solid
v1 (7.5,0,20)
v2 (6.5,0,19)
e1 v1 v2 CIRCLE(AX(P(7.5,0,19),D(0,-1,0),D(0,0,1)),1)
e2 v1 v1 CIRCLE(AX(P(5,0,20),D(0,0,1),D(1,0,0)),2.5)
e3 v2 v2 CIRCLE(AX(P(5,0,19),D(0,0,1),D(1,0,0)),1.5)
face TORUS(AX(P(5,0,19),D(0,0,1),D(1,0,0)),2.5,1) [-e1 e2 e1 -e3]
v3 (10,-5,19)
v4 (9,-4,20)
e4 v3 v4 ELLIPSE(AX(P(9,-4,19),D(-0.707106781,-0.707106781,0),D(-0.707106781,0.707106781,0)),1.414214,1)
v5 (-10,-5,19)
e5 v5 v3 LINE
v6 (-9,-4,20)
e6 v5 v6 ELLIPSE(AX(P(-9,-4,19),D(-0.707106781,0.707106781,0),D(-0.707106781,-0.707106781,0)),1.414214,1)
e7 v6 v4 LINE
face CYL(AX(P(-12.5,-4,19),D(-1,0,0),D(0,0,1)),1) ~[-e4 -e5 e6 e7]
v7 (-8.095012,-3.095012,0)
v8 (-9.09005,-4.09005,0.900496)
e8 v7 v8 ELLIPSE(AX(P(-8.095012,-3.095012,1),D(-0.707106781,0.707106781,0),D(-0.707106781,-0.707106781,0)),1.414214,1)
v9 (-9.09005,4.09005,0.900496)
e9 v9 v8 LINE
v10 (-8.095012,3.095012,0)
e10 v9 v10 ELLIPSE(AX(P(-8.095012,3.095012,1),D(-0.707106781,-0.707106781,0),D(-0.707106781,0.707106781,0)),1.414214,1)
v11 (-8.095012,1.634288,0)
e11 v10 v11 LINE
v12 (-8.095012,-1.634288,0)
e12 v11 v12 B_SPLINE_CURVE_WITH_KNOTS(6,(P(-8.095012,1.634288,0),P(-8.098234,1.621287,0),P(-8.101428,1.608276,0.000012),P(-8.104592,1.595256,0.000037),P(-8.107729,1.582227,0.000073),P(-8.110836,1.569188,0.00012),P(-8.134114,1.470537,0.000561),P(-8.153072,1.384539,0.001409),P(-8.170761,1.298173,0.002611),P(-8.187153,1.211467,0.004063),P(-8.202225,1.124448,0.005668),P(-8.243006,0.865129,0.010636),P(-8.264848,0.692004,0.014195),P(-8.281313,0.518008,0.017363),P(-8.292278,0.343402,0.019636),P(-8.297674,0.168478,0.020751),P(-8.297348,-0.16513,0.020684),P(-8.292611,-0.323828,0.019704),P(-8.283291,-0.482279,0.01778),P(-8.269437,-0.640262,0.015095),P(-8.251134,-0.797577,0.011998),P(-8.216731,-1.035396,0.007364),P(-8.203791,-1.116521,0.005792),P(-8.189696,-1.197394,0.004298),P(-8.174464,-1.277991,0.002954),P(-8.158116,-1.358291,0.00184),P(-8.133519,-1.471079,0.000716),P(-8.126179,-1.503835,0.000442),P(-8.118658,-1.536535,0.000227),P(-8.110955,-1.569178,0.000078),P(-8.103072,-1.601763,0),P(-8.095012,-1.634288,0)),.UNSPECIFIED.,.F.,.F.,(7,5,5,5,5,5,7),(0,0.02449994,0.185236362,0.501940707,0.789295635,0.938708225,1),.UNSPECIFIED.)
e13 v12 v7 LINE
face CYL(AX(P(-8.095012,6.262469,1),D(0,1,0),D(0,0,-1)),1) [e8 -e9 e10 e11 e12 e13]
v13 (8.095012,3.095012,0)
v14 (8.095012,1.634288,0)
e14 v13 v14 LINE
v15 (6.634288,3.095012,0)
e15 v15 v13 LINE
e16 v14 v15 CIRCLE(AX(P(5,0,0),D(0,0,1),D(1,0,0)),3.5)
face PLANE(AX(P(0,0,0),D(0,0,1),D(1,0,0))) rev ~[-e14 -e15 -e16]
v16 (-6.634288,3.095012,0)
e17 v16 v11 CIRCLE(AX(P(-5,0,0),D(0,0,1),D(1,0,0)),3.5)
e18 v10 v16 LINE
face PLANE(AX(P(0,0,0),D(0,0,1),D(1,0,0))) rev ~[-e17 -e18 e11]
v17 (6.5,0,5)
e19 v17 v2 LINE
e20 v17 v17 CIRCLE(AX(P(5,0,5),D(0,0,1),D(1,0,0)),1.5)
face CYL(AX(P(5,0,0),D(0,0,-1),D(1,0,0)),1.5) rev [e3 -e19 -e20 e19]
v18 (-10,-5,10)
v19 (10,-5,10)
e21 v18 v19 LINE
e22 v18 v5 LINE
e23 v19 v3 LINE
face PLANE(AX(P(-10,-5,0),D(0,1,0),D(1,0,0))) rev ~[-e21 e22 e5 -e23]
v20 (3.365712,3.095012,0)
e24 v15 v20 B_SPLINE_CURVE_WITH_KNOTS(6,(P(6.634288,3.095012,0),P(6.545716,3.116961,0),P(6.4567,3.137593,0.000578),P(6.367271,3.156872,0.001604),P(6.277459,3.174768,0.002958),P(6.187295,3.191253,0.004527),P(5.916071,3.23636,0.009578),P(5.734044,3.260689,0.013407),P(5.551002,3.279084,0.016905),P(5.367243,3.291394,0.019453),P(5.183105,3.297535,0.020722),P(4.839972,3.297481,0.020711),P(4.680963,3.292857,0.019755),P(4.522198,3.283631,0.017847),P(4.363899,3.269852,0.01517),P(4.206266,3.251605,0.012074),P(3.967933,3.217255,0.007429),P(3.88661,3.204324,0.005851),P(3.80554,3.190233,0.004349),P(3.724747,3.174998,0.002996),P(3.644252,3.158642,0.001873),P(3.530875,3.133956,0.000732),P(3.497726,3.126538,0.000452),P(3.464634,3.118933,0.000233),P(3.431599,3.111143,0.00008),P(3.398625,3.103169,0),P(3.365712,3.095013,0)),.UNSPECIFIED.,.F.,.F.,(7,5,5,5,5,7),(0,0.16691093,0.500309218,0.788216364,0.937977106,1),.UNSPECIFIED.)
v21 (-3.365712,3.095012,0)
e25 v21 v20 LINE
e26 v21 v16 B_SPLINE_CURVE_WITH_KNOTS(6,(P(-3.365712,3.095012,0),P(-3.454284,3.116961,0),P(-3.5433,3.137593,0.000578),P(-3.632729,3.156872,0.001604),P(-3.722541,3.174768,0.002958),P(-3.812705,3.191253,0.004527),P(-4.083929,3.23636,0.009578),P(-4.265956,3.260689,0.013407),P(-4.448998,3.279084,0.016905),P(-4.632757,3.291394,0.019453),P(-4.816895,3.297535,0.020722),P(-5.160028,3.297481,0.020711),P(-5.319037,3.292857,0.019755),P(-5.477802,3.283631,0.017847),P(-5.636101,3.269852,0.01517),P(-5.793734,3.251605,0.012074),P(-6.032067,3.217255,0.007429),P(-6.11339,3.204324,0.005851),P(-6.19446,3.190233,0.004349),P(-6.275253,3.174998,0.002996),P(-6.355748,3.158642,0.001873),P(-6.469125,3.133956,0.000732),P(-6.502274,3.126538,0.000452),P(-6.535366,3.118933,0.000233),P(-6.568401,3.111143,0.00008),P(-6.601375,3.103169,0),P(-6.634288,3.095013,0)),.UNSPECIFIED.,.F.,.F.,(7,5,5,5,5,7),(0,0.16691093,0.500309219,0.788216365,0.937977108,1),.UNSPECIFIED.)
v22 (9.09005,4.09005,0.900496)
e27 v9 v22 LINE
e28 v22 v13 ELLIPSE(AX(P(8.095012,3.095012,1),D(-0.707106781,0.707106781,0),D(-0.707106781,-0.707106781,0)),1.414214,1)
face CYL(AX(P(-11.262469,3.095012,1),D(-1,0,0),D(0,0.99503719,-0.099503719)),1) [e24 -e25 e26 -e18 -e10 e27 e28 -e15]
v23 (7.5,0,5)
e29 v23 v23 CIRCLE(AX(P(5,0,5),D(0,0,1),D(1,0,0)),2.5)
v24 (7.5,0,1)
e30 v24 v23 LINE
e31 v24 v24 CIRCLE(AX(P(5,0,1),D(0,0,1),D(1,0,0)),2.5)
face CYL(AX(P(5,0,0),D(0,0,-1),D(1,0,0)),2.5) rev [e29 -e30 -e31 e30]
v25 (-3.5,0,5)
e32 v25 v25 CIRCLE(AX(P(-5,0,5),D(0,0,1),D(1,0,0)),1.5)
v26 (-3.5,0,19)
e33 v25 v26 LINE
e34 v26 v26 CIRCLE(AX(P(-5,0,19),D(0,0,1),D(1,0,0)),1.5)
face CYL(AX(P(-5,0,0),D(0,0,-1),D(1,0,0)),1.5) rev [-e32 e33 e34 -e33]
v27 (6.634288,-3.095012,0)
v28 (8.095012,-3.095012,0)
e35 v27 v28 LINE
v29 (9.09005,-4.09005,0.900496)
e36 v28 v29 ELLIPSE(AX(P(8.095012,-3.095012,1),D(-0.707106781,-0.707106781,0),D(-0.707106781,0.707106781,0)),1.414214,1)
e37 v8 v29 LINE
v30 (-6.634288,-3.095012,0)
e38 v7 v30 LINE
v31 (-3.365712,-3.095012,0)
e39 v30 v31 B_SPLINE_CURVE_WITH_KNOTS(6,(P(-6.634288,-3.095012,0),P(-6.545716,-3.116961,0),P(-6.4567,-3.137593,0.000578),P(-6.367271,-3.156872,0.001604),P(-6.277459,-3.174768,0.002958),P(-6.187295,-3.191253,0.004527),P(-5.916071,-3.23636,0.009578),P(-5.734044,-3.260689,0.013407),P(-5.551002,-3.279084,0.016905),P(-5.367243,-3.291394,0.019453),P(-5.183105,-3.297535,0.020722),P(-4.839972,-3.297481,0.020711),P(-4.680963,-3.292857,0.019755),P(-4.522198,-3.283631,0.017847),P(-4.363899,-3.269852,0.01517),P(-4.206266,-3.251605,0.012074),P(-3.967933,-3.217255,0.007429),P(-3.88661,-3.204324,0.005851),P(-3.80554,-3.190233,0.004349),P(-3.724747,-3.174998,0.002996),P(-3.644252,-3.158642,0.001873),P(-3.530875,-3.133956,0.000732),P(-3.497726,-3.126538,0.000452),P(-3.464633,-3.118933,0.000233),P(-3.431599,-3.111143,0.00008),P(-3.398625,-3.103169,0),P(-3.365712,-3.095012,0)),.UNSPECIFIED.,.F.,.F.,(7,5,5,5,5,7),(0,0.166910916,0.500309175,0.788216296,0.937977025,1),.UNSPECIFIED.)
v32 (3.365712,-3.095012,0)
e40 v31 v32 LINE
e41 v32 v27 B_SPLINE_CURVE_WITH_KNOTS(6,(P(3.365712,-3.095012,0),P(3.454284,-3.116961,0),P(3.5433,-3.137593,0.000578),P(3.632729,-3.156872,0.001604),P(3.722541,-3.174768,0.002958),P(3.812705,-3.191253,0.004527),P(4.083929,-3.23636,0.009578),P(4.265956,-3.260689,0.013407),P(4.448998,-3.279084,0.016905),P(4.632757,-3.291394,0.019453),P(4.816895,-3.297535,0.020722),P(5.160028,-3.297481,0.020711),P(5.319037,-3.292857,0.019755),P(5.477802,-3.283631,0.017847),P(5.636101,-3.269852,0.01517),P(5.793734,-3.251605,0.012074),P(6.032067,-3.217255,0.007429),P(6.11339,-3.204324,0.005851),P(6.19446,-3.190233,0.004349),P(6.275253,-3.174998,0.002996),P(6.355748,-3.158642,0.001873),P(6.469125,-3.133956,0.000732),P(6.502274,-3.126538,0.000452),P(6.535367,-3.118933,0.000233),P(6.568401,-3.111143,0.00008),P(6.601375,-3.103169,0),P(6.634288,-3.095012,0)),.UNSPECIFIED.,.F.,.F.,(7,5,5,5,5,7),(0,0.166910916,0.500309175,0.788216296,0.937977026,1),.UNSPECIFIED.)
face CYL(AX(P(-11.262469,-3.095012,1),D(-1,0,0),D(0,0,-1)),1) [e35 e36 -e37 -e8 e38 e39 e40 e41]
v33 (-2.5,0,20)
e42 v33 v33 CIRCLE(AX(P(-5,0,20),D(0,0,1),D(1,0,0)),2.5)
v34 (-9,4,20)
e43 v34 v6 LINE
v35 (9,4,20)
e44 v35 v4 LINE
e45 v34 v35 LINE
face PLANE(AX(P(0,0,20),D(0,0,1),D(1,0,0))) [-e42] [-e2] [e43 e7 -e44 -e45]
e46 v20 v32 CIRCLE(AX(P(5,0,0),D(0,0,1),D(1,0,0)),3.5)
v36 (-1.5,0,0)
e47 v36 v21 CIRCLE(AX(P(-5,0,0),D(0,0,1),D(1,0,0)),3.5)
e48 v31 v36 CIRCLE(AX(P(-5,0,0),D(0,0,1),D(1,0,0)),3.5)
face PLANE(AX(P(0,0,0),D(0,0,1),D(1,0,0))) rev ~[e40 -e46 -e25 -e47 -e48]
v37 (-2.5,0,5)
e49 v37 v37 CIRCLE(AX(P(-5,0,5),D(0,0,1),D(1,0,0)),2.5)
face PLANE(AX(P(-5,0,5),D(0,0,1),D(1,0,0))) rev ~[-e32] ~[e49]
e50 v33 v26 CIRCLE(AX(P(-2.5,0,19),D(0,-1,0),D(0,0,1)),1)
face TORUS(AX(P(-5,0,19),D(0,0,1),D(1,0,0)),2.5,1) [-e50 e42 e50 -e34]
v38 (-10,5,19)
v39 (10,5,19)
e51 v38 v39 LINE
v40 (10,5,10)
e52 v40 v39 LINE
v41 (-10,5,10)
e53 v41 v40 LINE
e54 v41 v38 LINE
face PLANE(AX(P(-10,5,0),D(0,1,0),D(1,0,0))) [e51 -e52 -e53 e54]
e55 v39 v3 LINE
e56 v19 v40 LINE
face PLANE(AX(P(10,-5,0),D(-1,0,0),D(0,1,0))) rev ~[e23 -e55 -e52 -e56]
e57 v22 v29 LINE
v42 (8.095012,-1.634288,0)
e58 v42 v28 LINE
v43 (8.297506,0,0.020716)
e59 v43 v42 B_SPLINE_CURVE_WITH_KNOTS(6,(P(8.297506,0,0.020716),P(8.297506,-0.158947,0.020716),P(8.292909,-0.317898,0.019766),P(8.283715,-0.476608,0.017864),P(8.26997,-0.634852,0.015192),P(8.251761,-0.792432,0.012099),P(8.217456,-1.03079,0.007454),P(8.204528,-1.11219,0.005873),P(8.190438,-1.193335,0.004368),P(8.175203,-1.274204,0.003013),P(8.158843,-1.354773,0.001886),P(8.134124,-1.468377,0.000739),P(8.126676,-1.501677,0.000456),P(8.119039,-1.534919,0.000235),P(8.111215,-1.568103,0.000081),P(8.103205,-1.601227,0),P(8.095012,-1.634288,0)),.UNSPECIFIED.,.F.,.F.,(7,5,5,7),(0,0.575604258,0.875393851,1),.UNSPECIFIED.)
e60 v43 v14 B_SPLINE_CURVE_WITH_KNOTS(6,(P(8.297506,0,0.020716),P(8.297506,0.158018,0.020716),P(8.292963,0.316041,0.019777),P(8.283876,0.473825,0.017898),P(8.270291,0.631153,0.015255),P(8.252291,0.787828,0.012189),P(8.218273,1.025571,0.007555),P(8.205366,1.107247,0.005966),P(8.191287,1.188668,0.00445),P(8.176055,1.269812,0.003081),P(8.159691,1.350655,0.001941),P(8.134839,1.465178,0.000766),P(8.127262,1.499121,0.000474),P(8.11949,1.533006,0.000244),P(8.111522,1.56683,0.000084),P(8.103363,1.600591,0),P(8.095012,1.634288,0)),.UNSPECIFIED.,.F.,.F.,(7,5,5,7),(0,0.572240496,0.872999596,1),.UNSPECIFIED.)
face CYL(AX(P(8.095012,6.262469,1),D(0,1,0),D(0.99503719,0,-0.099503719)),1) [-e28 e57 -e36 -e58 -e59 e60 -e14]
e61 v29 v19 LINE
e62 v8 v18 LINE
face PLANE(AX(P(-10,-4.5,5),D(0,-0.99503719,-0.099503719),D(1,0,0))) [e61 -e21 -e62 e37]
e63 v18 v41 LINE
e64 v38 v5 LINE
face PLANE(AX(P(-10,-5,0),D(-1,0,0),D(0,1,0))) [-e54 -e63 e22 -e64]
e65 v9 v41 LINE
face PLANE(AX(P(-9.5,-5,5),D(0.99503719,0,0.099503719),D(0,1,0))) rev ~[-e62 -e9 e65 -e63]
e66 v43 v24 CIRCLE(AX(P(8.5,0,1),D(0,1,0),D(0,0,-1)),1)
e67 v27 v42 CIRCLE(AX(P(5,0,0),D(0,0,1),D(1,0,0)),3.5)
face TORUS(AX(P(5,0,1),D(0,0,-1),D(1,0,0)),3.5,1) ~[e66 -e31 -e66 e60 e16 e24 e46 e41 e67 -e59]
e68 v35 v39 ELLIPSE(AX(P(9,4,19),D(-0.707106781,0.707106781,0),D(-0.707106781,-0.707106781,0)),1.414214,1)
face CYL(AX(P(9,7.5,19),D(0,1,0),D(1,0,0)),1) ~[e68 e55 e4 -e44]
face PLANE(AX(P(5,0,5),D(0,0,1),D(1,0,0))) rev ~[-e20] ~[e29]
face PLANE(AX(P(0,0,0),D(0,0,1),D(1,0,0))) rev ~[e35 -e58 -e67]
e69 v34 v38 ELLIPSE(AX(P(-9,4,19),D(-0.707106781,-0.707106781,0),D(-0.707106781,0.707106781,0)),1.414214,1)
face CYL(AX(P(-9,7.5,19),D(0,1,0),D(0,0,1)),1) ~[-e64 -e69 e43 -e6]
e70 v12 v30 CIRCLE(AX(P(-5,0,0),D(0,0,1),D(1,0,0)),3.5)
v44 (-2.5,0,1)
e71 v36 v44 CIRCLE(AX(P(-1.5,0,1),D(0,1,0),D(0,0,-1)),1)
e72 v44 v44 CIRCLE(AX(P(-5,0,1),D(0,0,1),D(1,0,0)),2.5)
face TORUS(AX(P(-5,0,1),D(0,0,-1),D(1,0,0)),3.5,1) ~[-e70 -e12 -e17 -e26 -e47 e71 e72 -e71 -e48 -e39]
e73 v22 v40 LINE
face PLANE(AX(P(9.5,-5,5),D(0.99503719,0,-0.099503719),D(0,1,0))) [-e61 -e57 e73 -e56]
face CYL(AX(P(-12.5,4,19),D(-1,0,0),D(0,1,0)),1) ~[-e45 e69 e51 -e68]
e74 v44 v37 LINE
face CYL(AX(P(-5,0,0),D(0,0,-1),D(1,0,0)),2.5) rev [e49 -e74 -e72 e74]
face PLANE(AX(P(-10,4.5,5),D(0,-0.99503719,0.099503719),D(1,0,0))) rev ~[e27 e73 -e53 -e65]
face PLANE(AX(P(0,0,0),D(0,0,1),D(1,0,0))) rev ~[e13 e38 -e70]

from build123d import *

# Parameters (mm, degrees)
F0_W        = 20
F0_H        = 10
F0_W_2      = 17.7
F0_H_2      = 7.5
F0_R        = 2.5
F0_R_2      = 1.5
F1_DEPTH    = 20
F2_DEPTH    = 5
F3_SIZE2    = 10
F3_SIZE     = 1
F4_T1_DEPTH = 22.5249378106
F4_T3_DEPTH = 12.5249378106
F4_T5_DEPTH = 25
F4_T7_DEPTH = 15


# Not quite as in the source:
# - a fillet or chamfer that OpenCascade refuses, or shapes differently, is made with other operations: its cross-section is extruded or revolved along the edge and cut away or added


with BuildPart() as f1:
    # F0 (on Top) → F1 (new body)
    with BuildSketch(Plane.XY):
        Rectangle(F0_W, F0_H)
        Rectangle(F0_W_2, F0_H_2, mode=Mode.SUBTRACT)
        Rectangle(F0_W_2, F0_H_2)
        with Locations((-5, 0)):
            Circle(F0_R, mode=Mode.SUBTRACT)
        with Locations((5, 0)):
            Circle(F0_R, mode=Mode.SUBTRACT)
        with Locations((5, 0)):
            Circle(F0_R)
        with Locations((5, 0)):
            Circle(F0_R_2, mode=Mode.SUBTRACT)
        with Locations((-5, 0)):
            Circle(F0_R)
        with Locations((-5, 0)):
            Circle(F0_R_2, mode=Mode.SUBTRACT)
    extrude(amount=F1_DEPTH)

    # F0 (on Top) → F2 (cut)
    with BuildSketch(Plane.XY):
        with Locations((-5, 0)):
            Circle(F0_R)
        with Locations((-5, 0)):
            Circle(F0_R_2, mode=Mode.SUBTRACT)
        with Locations((5, 0)):
            Circle(F0_R)
        with Locations((5, 0)):
            Circle(F0_R_2, mode=Mode.SUBTRACT)
    extrude(amount=F2_DEPTH, mode=Mode.SUBTRACT)

    # F3
    f3_edges = [f1.edges().sort_by_distance(p)[0] for p in [
        (0, -5, 0),
        (-10, 0, 0),
        (0, 5, 0),
        (10, 0, 0),
    ]]
    f3_side = f1.faces().sort_by_distance((0, 0, 0))[0]
    chamfer(f3_edges, length=F3_SIZE, length2=F3_SIZE2, reference=f3_side)

    # F4: fillet of radius 1 on 12 edges, made by hand

    # F4_s2 → F4_t1 (cut)
    with BuildSketch(Plane.YZ.offset(-11.2624689053)):
        with BuildLine():
            ThreePointArc((-3.0950124379, 0), (-3.7660177586, 0.2585474664), (-4.0900496281, 0.900496281))
            Line((-4.0900496281, 0.900496281), (-4, 0))
            Line((-4, 0), (-3.0950124379, 0))
        make_face()
        with BuildLine():
            ThreePointArc((4.0900496281, 0.900496281), (3.7660177586, 0.2585474664), (3.0950124379, 0))
            Line((3.0950124379, 0), (4, 0))
            Line((4, 0), (4.0900496281, 0.900496281))
        make_face()
    extrude(amount=F4_T1_DEPTH, mode=Mode.SUBTRACT)

    # F4_s4 → F4_t3 (cut)
    with BuildSketch(Plane.XZ.offset(-6.2624689053)):
        with BuildLine():
            ThreePointArc((-8.0950124379, 0), (-8.7660177586, 0.2585474664), (-9.0900496281, 0.900496281))
            Line((-9.0900496281, 0.900496281), (-9, 0))
            Line((-9, 0), (-8.0950124379, 0))
        make_face()
        with BuildLine():
            ThreePointArc((9.0900496281, 0.900496281), (8.7660177586, 0.2585474664), (8.0950124379, 0))
            Line((8.0950124379, 0), (9, 0))
            Line((9, 0), (9.0900496281, 0.900496281))
        make_face()
    extrude(amount=F4_T3_DEPTH, mode=Mode.SUBTRACT)

    # F4_s6 → F4_t5 (cut)
    with BuildSketch(Plane.YZ.offset(-12.5)):
        with BuildLine():
            ThreePointArc((-4, 20), (-4.7071067812, 19.7071067812), (-5, 19))
            Line((-5, 19), (-5, 20))
            Line((-5, 20), (-4, 20))
        make_face()
        with BuildLine():
            ThreePointArc((5, 19), (4.7071067812, 19.7071067812), (4, 20))
            Line((4, 20), (5, 20))
            Line((5, 20), (5, 19))
        make_face()
    extrude(amount=F4_T5_DEPTH, mode=Mode.SUBTRACT)

    # F4_s8 → F4_t7 (cut)
    with BuildSketch(Plane.XZ.offset(-7.5)):
        with BuildLine():
            ThreePointArc((10, 19), (9.7071067812, 19.7071067812), (9, 20))
            Line((9, 20), (10, 20))
            Line((10, 20), (10, 19))
        make_face()
        with BuildLine():
            ThreePointArc((-9, 20), (-9.7071067812, 19.7071067812), (-10, 19))
            Line((-10, 19), (-10, 20))
            Line((-10, 20), (-9, 20))
        make_face()
    extrude(amount=F4_T7_DEPTH, mode=Mode.SUBTRACT)

    # F4_s9 → F4_t10 (revolve, cut)
    with BuildSketch(Plane.XZ):
        with BuildLine():
            ThreePointArc((7.5, 20), (6.7928932188, 19.7071067812), (6.5, 19))
            Line((6.5, 19), (6.5, 20))
            Line((6.5, 20), (7.5, 20))
        make_face()
    revolve(axis=Axis((5, 0, 20), (0, 0, 1)), mode=Mode.SUBTRACT)

    # F4_s11 → F4_t12 (revolve, cut)
    with BuildSketch(Plane.XZ):
        with BuildLine():
            ThreePointArc((-2.5, 20), (-3.2071067812, 19.7071067812), (-3.5, 19))
            Line((-3.5, 19), (-3.5, 20))
            Line((-3.5, 20), (-2.5, 20))
        make_face()
    revolve(axis=Axis((-5, 0, 20), (0, 0, 1)), mode=Mode.SUBTRACT)

    # F4_s13 → F4_t14 (revolve, cut)
    with BuildSketch(Plane.XZ):
        with BuildLine():
            ThreePointArc((8.5, 0), (7.7928932188, 0.2928932188), (7.5, 1))
            Line((7.5, 1), (7.5, 0))
            Line((7.5, 0), (8.5, 0))
        make_face()
    revolve(axis=Axis((5, 0, 0), (0, 0, 1)), mode=Mode.SUBTRACT)

    # F4_s15 → F4_t16 (revolve, cut)
    with BuildSketch(Plane.XZ):
        with BuildLine():
            ThreePointArc((-1.5, 0), (-2.2071067812, 0.2928932188), (-2.5, 1))
            Line((-2.5, 1), (-2.5, 0))
            Line((-2.5, 0), (-1.5, 0))
        make_face()
    revolve(axis=Axis((-5, 0, 0), (0, 0, 1)), mode=Mode.SUBTRACT)


solid = f1.part
